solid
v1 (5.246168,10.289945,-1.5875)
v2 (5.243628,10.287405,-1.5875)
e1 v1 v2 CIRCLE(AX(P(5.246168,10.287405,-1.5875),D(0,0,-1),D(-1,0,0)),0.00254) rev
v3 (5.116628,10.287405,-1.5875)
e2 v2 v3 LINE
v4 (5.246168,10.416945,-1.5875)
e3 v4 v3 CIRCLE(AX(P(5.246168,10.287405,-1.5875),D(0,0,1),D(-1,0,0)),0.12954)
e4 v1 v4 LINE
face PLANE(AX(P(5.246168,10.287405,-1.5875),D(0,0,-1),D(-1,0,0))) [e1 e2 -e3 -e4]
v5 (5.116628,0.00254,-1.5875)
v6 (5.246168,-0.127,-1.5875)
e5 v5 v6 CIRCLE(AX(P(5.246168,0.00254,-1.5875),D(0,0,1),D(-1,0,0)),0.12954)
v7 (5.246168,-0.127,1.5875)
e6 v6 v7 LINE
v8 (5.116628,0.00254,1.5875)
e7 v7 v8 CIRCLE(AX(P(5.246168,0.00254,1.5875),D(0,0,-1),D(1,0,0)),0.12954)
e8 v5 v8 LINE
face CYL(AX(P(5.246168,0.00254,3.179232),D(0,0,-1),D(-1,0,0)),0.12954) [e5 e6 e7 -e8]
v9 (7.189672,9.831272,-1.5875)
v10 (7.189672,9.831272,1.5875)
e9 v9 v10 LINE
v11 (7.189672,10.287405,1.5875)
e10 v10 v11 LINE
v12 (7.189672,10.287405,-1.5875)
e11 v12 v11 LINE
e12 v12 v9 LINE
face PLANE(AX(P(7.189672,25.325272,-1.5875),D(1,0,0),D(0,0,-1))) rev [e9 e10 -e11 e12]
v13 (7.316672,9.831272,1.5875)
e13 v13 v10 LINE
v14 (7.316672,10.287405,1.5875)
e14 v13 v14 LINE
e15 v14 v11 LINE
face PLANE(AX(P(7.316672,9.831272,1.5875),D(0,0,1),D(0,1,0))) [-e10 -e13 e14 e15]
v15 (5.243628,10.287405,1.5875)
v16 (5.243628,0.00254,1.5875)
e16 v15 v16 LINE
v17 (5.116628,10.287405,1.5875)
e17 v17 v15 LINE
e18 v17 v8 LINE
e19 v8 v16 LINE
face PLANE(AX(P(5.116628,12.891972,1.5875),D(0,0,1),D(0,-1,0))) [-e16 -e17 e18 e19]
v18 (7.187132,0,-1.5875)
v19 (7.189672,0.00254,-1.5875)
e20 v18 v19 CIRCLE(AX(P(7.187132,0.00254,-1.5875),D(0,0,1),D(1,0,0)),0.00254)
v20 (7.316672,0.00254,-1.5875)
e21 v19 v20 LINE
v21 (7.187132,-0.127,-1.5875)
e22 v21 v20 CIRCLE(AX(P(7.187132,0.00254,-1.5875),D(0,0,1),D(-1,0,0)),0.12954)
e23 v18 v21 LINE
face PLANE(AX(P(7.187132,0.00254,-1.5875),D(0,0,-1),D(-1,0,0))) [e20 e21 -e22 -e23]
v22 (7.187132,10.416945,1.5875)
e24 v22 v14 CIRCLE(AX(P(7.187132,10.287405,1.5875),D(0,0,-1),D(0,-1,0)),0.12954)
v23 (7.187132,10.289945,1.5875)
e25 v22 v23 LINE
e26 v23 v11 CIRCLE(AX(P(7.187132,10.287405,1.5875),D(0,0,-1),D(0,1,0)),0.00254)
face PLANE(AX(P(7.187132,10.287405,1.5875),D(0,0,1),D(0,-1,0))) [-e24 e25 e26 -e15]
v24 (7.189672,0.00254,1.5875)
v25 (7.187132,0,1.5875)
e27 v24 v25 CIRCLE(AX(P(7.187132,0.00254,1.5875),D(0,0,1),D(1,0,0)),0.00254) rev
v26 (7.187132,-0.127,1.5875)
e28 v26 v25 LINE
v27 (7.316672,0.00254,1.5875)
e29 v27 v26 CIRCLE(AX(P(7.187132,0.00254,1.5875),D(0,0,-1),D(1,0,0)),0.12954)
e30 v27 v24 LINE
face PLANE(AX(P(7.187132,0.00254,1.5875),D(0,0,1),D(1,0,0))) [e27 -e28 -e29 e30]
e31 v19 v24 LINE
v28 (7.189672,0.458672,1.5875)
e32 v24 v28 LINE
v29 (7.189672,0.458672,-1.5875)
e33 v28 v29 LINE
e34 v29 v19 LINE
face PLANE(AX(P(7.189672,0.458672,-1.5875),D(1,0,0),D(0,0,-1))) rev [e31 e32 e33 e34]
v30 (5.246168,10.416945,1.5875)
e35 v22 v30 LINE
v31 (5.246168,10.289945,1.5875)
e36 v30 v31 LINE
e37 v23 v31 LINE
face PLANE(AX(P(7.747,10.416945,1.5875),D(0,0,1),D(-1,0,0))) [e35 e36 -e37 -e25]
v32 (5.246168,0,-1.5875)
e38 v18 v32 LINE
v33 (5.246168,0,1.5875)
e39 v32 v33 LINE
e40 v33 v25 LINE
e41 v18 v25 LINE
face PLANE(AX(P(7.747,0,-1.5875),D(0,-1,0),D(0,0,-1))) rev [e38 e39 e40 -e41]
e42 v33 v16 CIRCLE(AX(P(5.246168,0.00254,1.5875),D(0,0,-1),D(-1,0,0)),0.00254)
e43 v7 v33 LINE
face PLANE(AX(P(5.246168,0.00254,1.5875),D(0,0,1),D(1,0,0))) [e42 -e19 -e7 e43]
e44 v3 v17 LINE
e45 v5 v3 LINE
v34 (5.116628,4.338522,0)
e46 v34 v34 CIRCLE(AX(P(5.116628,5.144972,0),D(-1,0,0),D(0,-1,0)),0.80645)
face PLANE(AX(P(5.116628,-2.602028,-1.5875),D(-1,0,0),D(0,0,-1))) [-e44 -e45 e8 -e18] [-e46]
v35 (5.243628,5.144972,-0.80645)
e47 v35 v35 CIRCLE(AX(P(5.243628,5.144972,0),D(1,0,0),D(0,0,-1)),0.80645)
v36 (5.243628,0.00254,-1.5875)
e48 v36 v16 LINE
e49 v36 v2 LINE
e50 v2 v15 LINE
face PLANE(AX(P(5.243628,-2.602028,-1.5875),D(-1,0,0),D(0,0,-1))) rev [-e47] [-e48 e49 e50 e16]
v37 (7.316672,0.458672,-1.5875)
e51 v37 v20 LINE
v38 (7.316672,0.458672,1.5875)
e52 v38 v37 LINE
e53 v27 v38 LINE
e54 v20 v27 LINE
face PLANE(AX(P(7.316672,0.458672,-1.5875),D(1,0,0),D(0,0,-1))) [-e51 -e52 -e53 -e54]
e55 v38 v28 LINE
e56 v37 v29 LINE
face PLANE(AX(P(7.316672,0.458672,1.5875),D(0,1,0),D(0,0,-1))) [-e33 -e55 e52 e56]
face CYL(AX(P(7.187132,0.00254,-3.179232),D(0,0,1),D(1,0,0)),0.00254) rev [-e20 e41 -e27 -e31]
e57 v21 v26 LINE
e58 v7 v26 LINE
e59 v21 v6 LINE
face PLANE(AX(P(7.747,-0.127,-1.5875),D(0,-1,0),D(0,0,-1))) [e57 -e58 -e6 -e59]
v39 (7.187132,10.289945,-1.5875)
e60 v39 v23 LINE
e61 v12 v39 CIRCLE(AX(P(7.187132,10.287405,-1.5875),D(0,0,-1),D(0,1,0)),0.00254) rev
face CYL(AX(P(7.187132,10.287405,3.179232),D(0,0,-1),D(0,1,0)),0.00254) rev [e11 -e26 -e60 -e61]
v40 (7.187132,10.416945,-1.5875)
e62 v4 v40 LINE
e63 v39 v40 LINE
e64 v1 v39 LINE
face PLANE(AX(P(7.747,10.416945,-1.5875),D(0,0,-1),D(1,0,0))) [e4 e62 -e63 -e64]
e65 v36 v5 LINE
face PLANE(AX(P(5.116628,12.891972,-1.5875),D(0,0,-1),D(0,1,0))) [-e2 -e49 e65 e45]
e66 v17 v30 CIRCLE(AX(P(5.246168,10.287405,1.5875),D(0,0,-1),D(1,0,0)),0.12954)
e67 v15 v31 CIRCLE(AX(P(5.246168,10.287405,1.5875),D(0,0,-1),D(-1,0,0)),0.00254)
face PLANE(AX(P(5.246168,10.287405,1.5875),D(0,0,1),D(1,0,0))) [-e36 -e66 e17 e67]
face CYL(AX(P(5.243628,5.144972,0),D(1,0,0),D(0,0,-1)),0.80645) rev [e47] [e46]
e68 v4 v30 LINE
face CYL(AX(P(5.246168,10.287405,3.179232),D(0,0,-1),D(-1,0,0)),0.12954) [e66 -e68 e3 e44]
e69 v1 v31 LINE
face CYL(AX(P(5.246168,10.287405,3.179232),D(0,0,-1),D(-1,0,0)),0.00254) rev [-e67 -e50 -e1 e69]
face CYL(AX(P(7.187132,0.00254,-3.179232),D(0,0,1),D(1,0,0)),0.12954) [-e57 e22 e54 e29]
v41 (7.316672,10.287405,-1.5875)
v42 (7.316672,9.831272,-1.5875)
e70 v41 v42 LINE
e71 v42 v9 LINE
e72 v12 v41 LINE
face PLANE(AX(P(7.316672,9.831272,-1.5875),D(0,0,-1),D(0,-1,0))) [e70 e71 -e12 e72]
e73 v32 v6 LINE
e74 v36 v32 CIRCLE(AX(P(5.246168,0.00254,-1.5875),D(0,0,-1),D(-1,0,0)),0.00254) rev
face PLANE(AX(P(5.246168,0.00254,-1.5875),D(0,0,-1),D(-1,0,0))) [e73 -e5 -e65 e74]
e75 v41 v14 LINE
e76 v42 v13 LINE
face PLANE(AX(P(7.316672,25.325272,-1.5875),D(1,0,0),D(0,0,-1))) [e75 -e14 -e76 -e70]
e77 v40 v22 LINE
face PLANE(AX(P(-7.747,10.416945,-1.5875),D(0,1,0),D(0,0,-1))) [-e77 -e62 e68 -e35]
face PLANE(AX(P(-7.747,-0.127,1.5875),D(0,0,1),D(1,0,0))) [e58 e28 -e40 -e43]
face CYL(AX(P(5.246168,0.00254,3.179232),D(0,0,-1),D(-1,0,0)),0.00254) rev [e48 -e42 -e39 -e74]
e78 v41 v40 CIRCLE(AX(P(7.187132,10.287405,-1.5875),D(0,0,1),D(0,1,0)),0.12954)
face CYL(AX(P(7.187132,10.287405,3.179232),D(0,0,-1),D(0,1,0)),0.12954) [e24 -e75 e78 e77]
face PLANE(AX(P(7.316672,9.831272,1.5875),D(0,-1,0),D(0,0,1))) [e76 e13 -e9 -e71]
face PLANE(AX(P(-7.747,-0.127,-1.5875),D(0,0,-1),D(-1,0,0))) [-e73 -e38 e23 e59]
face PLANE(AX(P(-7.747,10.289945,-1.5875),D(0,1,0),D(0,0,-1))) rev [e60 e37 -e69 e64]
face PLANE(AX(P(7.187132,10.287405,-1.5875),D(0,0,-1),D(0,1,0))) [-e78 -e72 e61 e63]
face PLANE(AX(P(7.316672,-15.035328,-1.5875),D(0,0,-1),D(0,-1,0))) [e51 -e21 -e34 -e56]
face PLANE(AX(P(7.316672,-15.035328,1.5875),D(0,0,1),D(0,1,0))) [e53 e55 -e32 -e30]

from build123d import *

# Parameters (mm, degrees)
SKETCH1_W                 = 15.494
SKETCH1_H                 = 3.175
BASE_FLANGE1_DEPTH        = 0.127
SKETCHED_START            = -1.5875
SKETCHED_BEND16_DEPTH     = 3.175
SKETCHED_BEND16_2_DEPTH   = 3.175
F_0_CLEARANCE_HOLE1_D     = 1.6129
F_0_CLEARANCE_HOLE1_DEPTH = 4.826
F_0_CLEARANCE_HOLE1_TIP   = 0.484564046


# Read off the part's stored shape, not the designer's step: Sketched Bend16
# Sheet-metal steps are written as plain solids
with BuildPart() as part:
    # Sketch1 → Base-Flange1 (new body)
    with BuildSketch(Plane(origin=(0, 0, 0), x_dir=(1, 0, 0), z_dir=(0, 1, 0))):
        Rectangle(SKETCH1_W, SKETCH1_H)
    extrude(amount=-BASE_FLANGE1_DEPTH)

    # Sketched Bend16 outline → Sketched Bend16 (cut)
    with BuildSketch(Plane.XY.offset(SKETCHED_START)):
        with BuildLine():
            ThreePointArc((5.246167695, -0.127), (5.155471554, -0.089952279), (5.116652599, 0))
            Line((5.116652599, 0), (-7.747, 0))
            Line((-7.747, 0), (-7.747, -0.127))
            Line((-7.747, -0.127), (5.246167695, -0.127))
        make_face()
        with BuildLine():
            Line((7.747, 0), (7.316647401, 0))
            ThreePointArc((7.316647401, 0), (7.277828446, -0.089952279), (7.187132305, -0.127))
            Line((7.187132305, -0.127), (7.747, -0.127))
            Line((7.747, -0.127), (7.747, 0))
        make_face()
    extrude(amount=SKETCHED_BEND16_DEPTH, mode=Mode.SUBTRACT)

    # Sketched Bend16 2 outline → Sketched Bend16 2 (add)
    with BuildSketch(Plane.XY.offset(SKETCHED_START)):
        with BuildLine():
            Line((5.243627695, 0.00254), (5.243627695, 10.287404611))
            ThreePointArc((5.243627695, 10.287404611), (5.244371643, 10.289200662), (5.246167695, 10.289944611))
            Line((5.246167695, 10.289944611), (7.187132305, 10.289944611))
            ThreePointArc((7.187132305, 10.289944611), (7.188928357, 10.289200662), (7.189672305, 10.287404611))
            Line((7.189672305, 10.287404611), (7.189672305, 9.831272305))
            Line((7.189672305, 9.831272305), (7.316672305, 9.831272305))
            Line((7.316672305, 9.831272305), (7.316672305, 10.287404611))
            ThreePointArc((7.316672305, 10.287404611), (7.278730917, 10.379003223), (7.187132305, 10.416944611))
            Line((7.187132305, 10.416944611), (5.246167695, 10.416944611))
            ThreePointArc((5.246167695, 10.416944611), (5.154569083, 10.379003223), (5.116627695, 10.287404611))
            Line((5.116627695, 10.287404611), (5.116627695, 0.00254))
            ThreePointArc((5.116627695, 0.00254), (5.116633921, 0.001269939), (5.116652599, 0))
            Line((5.116652599, 0), (5.246167695, 0))
            ThreePointArc((5.246167695, 0), (5.244371644, 0.000743949), (5.243627695, 0.00254))
        make_face()
        with BuildLine():
            ThreePointArc((7.189672305, 0.00254), (7.188928356, 0.000743949), (7.187132305, 0))
            Line((7.187132305, 0), (7.316647401, 0))
            ThreePointArc((7.316647401, 0), (7.316666079, 0.001269939), (7.316672305, 0.00254))
            Line((7.316672305, 0.00254), (7.316672305, 0.458672305))
            Line((7.316672305, 0.458672305), (7.189672305, 0.458672305))
            Line((7.189672305, 0.458672305), (7.189672305, 0.00254))
        make_face()
    extrude(amount=SKETCHED_BEND16_2_DEPTH)

    # #0 Clearance Hole1
    with Locations(Plane(origin=(5.243627695, 0, 0), x_dir=(0, 0, -1), z_dir=(1, 0, 0))):
        with Locations((0, 5.144972305)):
            Hole(F_0_CLEARANCE_HOLE1_D / 2, depth=F_0_CLEARANCE_HOLE1_DEPTH)
            with Locations((0, 0, -(F_0_CLEARANCE_HOLE1_DEPTH + F_0_CLEARANCE_HOLE1_TIP / 2))):  # 118° drill point
                Cone(0, F_0_CLEARANCE_HOLE1_D / 2, F_0_CLEARANCE_HOLE1_TIP, mode=Mode.SUBTRACT)


solid = part.part
